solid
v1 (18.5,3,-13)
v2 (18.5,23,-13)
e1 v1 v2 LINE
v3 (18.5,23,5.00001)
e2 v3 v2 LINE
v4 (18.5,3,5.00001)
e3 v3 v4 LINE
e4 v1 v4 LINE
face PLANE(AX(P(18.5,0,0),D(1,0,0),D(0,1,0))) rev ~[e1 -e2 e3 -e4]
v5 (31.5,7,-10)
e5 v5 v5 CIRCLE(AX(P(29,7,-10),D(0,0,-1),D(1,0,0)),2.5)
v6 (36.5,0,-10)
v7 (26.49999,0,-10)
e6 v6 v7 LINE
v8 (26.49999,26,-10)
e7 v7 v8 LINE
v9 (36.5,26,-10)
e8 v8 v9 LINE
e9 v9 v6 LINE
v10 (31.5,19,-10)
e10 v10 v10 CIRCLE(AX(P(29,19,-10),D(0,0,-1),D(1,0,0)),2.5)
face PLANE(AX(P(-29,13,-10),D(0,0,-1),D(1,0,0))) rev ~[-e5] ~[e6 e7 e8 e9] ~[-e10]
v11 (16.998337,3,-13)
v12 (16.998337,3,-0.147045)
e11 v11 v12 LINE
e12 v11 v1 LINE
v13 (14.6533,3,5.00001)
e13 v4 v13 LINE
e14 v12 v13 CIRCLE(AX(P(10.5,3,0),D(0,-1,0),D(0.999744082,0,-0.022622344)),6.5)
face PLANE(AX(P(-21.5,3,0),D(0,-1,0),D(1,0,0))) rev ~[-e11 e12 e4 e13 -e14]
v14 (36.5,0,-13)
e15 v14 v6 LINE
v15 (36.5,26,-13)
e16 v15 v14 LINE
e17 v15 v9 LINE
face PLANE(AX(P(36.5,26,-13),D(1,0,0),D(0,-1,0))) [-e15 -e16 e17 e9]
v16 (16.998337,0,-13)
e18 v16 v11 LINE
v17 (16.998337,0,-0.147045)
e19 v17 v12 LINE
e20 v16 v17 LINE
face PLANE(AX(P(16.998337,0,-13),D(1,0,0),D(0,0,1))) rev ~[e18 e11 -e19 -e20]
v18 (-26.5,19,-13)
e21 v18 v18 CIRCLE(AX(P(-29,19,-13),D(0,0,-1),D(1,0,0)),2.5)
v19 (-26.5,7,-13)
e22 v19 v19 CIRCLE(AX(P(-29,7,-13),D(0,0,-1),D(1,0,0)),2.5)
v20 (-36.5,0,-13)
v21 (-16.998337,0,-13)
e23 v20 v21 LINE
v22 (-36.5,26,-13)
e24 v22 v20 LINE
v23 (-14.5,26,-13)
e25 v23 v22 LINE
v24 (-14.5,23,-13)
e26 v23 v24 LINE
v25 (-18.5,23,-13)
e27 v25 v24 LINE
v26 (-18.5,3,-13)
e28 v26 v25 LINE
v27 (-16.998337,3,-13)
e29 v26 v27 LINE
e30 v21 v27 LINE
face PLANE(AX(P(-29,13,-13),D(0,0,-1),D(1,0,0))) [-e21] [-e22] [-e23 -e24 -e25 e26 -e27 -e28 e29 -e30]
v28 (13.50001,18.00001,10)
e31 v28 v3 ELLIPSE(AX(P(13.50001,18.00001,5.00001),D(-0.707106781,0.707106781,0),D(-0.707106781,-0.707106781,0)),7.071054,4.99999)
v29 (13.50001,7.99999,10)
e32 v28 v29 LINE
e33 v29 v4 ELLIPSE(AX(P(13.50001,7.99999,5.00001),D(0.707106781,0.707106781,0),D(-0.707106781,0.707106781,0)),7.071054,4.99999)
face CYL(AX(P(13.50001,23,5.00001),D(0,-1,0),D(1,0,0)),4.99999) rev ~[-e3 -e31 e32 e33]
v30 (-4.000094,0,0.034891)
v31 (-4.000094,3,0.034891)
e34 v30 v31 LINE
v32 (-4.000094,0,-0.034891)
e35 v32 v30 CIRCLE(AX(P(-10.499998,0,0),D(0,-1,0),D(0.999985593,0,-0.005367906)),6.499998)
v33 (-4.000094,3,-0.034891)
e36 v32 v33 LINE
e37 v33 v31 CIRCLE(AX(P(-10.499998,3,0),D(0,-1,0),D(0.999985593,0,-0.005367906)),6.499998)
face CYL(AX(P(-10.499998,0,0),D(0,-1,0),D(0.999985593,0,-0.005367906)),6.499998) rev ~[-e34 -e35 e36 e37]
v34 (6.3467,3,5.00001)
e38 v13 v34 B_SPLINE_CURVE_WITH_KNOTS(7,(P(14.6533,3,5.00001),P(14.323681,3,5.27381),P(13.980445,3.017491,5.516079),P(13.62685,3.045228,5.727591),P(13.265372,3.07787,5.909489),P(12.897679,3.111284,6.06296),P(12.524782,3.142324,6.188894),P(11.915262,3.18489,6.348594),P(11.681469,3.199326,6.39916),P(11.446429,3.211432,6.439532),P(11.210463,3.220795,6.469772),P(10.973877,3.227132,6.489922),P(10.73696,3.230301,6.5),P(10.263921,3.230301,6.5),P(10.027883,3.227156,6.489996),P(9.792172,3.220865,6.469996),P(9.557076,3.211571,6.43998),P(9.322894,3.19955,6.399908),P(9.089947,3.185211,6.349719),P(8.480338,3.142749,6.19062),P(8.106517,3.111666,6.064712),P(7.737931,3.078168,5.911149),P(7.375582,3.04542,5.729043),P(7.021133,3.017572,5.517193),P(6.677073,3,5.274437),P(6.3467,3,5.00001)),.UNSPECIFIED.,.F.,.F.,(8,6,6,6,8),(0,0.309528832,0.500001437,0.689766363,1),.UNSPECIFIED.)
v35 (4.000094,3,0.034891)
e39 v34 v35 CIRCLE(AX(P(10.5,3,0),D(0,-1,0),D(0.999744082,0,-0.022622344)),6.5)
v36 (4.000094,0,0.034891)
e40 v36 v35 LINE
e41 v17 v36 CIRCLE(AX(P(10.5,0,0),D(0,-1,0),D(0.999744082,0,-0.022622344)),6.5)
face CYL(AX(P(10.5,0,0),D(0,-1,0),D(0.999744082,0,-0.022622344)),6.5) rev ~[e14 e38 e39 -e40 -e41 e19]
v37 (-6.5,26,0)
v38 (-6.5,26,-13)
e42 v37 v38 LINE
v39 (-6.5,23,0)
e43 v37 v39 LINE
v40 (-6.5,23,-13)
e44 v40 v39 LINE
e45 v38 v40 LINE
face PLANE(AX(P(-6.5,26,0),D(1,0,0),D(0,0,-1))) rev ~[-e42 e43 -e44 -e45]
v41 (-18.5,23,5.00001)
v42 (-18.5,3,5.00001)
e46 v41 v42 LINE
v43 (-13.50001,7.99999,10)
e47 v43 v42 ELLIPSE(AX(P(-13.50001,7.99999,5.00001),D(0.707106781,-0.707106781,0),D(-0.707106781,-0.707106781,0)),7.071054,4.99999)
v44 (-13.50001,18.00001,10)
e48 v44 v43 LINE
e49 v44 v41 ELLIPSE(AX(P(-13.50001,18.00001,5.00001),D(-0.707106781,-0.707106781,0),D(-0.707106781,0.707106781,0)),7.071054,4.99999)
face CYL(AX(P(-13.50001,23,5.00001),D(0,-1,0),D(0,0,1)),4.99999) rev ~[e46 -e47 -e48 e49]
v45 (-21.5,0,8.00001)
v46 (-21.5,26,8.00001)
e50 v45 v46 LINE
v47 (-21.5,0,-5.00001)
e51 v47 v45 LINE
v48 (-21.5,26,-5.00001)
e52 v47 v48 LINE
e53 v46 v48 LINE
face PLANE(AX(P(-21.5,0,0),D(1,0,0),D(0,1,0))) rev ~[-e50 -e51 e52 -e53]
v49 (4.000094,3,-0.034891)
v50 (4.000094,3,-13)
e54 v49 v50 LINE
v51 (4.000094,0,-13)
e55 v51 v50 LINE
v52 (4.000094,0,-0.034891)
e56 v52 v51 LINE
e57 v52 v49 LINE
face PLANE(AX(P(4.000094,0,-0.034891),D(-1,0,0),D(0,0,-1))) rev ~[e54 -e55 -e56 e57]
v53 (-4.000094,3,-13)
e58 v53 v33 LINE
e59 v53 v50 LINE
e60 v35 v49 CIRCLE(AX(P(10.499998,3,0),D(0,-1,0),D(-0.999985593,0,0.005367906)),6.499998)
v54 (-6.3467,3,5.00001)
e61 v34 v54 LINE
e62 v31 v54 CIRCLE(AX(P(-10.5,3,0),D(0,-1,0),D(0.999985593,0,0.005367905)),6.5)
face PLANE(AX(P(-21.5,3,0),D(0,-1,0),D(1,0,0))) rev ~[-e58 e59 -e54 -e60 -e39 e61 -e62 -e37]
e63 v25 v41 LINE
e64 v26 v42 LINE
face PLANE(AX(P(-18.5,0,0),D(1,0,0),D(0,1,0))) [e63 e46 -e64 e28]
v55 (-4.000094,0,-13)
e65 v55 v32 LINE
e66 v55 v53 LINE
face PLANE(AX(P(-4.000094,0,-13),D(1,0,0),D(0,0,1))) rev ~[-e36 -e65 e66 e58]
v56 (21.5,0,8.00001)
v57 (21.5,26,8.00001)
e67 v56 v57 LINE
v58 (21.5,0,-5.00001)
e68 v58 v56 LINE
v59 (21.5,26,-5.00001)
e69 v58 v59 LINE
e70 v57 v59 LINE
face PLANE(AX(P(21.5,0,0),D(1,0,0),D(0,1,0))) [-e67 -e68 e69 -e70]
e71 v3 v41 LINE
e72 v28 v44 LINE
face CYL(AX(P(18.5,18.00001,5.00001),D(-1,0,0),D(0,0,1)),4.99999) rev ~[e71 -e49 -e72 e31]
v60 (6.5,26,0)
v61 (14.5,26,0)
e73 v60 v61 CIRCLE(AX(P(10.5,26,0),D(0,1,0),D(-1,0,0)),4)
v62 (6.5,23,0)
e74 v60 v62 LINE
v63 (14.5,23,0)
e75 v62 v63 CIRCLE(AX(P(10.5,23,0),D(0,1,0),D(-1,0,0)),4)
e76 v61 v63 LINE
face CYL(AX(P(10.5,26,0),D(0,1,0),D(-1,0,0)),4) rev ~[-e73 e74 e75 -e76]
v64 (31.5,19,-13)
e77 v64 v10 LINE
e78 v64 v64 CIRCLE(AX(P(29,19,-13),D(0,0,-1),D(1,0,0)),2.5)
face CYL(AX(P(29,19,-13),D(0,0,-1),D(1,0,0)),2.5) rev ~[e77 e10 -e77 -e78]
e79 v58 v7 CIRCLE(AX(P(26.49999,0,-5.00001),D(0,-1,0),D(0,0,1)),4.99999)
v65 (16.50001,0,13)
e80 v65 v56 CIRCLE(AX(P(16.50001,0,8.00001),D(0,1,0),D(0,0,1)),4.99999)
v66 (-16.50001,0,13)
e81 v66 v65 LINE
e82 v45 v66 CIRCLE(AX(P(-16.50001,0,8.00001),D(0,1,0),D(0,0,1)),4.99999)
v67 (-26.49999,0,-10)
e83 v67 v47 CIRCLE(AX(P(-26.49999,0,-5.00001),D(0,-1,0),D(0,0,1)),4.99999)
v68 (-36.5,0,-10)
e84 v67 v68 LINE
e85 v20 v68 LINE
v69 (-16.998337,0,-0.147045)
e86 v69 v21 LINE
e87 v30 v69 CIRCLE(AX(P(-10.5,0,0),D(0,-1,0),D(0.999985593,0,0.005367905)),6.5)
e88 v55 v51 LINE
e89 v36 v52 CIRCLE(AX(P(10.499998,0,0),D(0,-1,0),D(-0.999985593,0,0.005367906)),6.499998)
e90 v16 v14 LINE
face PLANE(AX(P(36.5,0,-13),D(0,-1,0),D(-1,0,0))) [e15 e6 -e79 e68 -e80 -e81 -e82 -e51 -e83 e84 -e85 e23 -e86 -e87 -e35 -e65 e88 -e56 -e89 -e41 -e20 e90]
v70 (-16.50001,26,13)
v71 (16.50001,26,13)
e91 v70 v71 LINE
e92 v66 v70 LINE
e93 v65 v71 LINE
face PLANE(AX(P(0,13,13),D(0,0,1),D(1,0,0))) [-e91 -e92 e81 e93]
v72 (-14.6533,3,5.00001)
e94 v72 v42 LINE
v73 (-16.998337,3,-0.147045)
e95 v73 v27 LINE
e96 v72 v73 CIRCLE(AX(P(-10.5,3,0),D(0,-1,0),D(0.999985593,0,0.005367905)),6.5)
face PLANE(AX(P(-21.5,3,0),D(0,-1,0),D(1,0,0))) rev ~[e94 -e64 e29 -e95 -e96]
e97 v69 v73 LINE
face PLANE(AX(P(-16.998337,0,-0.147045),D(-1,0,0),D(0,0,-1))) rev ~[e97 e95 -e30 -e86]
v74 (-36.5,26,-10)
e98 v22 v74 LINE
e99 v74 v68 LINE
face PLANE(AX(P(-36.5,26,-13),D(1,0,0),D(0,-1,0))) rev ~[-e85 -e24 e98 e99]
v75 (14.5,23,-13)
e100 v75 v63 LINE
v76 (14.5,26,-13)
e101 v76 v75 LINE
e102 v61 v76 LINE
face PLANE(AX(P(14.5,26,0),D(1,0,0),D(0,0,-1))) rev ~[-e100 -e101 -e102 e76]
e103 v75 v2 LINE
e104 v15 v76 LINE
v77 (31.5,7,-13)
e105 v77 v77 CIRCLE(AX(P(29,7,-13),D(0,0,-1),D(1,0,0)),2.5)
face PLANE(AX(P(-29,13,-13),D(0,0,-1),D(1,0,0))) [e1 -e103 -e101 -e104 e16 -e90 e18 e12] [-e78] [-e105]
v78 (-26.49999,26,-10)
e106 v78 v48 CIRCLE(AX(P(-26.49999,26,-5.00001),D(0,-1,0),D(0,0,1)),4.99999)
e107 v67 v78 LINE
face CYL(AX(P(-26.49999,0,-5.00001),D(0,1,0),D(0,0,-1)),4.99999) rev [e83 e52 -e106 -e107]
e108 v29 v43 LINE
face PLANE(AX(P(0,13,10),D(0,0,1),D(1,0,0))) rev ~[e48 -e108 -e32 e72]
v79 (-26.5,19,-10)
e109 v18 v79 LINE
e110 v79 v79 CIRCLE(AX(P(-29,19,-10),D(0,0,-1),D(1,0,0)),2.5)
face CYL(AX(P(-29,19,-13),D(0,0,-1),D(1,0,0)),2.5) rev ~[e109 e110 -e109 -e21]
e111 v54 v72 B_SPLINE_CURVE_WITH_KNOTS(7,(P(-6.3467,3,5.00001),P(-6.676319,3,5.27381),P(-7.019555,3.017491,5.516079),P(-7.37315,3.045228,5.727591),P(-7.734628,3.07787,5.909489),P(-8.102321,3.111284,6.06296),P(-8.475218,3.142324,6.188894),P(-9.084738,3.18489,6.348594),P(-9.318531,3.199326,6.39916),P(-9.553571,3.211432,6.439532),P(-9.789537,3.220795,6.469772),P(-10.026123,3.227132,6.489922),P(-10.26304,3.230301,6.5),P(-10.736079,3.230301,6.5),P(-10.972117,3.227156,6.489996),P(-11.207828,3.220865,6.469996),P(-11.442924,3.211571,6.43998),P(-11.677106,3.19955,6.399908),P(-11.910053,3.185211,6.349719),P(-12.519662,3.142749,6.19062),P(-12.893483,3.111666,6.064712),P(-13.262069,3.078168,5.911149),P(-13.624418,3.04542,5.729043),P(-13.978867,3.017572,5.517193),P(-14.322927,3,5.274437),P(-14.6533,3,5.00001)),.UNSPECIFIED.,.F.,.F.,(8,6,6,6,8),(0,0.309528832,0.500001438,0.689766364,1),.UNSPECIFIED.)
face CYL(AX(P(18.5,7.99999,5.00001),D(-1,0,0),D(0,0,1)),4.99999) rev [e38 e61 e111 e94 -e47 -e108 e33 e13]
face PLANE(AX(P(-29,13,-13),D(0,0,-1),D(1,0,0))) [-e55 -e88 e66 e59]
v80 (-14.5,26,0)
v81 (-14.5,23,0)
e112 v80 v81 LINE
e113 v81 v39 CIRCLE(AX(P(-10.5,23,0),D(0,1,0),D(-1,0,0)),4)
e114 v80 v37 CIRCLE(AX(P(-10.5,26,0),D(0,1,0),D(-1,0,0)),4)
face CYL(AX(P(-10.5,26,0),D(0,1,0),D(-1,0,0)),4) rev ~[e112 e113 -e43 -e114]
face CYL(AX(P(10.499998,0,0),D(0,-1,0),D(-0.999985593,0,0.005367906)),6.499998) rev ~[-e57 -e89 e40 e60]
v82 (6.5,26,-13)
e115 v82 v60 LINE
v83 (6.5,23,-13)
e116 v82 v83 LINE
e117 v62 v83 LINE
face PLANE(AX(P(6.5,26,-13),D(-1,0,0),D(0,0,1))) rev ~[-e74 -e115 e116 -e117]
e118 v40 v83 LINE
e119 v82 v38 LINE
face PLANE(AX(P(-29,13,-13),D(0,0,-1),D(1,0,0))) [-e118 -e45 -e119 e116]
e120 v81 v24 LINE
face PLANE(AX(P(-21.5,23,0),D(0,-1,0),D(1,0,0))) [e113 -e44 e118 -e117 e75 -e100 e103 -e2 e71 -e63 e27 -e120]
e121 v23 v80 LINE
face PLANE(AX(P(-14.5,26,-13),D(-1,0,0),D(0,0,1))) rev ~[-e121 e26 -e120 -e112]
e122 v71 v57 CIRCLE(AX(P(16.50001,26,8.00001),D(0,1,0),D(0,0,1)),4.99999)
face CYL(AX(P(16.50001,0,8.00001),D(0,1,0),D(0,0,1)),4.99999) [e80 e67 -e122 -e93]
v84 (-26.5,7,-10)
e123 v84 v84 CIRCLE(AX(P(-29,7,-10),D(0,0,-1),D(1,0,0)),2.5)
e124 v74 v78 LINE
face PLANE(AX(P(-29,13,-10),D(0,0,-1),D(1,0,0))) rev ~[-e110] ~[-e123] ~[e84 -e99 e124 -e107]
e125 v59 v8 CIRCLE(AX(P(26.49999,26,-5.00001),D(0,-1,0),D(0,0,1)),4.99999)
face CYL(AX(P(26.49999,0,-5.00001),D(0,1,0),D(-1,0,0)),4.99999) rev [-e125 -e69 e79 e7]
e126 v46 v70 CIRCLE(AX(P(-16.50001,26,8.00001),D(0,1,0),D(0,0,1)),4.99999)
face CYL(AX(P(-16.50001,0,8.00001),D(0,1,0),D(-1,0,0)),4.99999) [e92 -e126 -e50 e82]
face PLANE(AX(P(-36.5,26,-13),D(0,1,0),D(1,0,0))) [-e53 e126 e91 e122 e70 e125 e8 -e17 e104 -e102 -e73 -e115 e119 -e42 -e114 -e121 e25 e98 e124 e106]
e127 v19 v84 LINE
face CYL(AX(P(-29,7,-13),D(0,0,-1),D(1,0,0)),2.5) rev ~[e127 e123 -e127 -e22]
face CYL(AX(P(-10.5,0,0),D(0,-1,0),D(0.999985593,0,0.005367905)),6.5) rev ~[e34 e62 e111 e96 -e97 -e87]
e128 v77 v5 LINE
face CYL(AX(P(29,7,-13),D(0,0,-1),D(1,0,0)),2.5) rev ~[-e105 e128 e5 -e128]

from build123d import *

# Parameters (mm, degrees)
F1_W          = 43
F1_H          = 26
F2_DEPTH      = 13
F2_DEPTH_BACK = 13
F3_T          = -3
F5_W          = 15
F5_H          = 26
F5_R          = 2.5
F5_W_2        = 43
F5_W_3        = 37
F5_H_2        = 20
F6_DEPTH      = 3
F7_R          = 4.99999
F9_DEPTH      = 5
F10_DEPTH     = 25


# Not quite as in the source:
# - a fillet or chamfer is up to 0.001 mm smaller than in the source, because OpenCascade refuses the exact size


with BuildPart() as f2:
    # F1 (on Top) → F2 (new body, two sides)
    with BuildSketch(Plane.XY) as f2_sk:
        with Locations((0, 13)):
            Rectangle(F1_W, F1_H)
    extrude(amount=F2_DEPTH)
    extrude(f2_sk.sketch, amount=-F2_DEPTH_BACK)

    # F3
    f3_openings = [f2.faces().sort_by_distance(p)[0] for p in [
        (0, 13, -13),
    ]]
    offset(amount=F3_T, openings=f3_openings)

    # F5 (on face) → F6 (join)
    with BuildSketch(Plane(origin=(0, 0, -13), x_dir=(1, 0, 0), z_dir=(0, 0, -1))):
        with Locations((-29, -13)):
            Rectangle(F5_W, F5_H)
        with Locations((-29, -19)):
            Circle(F5_R, mode=Mode.SUBTRACT)
        with Locations((-29, -7)):
            Circle(F5_R, mode=Mode.SUBTRACT)
        with Locations((0, -13)):
            Rectangle(F5_W_2, F5_H)
        with Locations((0, -13)):
            Rectangle(F5_W_3, F5_H_2, mode=Mode.SUBTRACT)
        with Locations((29, -13)):
            Rectangle(F5_W, F5_H)
        with Locations((29, -19)):
            Circle(F5_R, mode=Mode.SUBTRACT)
        with Locations((29, -7)):
            Circle(F5_R, mode=Mode.SUBTRACT)
    extrude(amount=-F6_DEPTH)

    # F7 (radius 5 in the source; OpenCascade refuses exactly that, so slightly less here)
    f7_edges = [f2.edges().sort_by_distance(p)[0] for p in [
        (-21.5, 13, 13),
        (21.5, 13, 13),
        (-21.5, 13, -10),
        (21.5, 13, -10),
        (0, 23, 10),
        (0, 3, 10),
        (-18.5, 13, 10),
        (18.5, 13, 10),
    ]]
    fillet(f7_edges, radius=F7_R)

    # F8 (on face) → F9 (cut)
    with BuildSketch(Plane.XZ):
        with BuildLine():
            Line((-4.0000936475, -11), (-4.0000936475, -0.0348913798))
            ThreePointArc((-4.0000936475, -0.0348913798), (-4, 0), (-4.0000936475, 0.0348913798))
            ThreePointArc((-4.0000936475, 0.0348913798), (-10.5909716955, 6.499363365), (-16.9983365331, -0.1470452389))
            Line((-16.9983365331, -0.1470452389), (-16.9983365331, -10.9773843356))
            Line((-16.9983365331, -10.9773843356), (-16.9983365331, -13))
            Line((-16.9983365331, -13), (-4.0000936475, -13))
            Line((-4.0000936475, -13), (-4.0000936475, -11))
        make_face()
        with BuildLine():
            ThreePointArc((4.0000936475, 0.0348913798), (4, 0), (4.0000936475, -0.0348913798))
            Line((4.0000936475, -0.0348913798), (4.0000936475, -11))
            Line((4.0000936475, -11), (4.0000936475, -13))
            Line((4.0000936475, -13), (16.9983365331, -13))
            Line((16.9983365331, -13), (16.9983365331, -10.9773843356))
            Line((16.9983365331, -10.9773843356), (16.9983365331, -0.1470452389))
            ThreePointArc((16.9983365331, -0.1470452389), (10.5909716955, 6.499363365), (4.0000936475, 0.0348913798))
        make_face()
    extrude(amount=-F9_DEPTH, mode=Mode.SUBTRACT)

    # F4 (on face) → F10 (cut)
    with BuildSketch(Plane(origin=(0, 26, 0), x_dir=(-1, 0, 0), z_dir=(0, 1, 0))):
        with BuildLine():
            Line((-6.5, -13), (-6.5, 0))
            ThreePointArc((-6.5, 0), (-10.5, 4), (-14.5, 0))
            Line((-14.5, 0), (-14.5, -13))
            Line((-14.5, -13), (-6.5, -13))
        make_face()
        with BuildLine():
            ThreePointArc((14.5, 0), (10.5, 4), (6.5, 0))
            Line((6.5, 0), (6.5, -13))
            Line((6.5, -13), (14.5, -13))
            Line((14.5, -13), (14.5, 0))
        make_face()
    extrude(amount=-F10_DEPTH, mode=Mode.SUBTRACT)


solid = f2.part
